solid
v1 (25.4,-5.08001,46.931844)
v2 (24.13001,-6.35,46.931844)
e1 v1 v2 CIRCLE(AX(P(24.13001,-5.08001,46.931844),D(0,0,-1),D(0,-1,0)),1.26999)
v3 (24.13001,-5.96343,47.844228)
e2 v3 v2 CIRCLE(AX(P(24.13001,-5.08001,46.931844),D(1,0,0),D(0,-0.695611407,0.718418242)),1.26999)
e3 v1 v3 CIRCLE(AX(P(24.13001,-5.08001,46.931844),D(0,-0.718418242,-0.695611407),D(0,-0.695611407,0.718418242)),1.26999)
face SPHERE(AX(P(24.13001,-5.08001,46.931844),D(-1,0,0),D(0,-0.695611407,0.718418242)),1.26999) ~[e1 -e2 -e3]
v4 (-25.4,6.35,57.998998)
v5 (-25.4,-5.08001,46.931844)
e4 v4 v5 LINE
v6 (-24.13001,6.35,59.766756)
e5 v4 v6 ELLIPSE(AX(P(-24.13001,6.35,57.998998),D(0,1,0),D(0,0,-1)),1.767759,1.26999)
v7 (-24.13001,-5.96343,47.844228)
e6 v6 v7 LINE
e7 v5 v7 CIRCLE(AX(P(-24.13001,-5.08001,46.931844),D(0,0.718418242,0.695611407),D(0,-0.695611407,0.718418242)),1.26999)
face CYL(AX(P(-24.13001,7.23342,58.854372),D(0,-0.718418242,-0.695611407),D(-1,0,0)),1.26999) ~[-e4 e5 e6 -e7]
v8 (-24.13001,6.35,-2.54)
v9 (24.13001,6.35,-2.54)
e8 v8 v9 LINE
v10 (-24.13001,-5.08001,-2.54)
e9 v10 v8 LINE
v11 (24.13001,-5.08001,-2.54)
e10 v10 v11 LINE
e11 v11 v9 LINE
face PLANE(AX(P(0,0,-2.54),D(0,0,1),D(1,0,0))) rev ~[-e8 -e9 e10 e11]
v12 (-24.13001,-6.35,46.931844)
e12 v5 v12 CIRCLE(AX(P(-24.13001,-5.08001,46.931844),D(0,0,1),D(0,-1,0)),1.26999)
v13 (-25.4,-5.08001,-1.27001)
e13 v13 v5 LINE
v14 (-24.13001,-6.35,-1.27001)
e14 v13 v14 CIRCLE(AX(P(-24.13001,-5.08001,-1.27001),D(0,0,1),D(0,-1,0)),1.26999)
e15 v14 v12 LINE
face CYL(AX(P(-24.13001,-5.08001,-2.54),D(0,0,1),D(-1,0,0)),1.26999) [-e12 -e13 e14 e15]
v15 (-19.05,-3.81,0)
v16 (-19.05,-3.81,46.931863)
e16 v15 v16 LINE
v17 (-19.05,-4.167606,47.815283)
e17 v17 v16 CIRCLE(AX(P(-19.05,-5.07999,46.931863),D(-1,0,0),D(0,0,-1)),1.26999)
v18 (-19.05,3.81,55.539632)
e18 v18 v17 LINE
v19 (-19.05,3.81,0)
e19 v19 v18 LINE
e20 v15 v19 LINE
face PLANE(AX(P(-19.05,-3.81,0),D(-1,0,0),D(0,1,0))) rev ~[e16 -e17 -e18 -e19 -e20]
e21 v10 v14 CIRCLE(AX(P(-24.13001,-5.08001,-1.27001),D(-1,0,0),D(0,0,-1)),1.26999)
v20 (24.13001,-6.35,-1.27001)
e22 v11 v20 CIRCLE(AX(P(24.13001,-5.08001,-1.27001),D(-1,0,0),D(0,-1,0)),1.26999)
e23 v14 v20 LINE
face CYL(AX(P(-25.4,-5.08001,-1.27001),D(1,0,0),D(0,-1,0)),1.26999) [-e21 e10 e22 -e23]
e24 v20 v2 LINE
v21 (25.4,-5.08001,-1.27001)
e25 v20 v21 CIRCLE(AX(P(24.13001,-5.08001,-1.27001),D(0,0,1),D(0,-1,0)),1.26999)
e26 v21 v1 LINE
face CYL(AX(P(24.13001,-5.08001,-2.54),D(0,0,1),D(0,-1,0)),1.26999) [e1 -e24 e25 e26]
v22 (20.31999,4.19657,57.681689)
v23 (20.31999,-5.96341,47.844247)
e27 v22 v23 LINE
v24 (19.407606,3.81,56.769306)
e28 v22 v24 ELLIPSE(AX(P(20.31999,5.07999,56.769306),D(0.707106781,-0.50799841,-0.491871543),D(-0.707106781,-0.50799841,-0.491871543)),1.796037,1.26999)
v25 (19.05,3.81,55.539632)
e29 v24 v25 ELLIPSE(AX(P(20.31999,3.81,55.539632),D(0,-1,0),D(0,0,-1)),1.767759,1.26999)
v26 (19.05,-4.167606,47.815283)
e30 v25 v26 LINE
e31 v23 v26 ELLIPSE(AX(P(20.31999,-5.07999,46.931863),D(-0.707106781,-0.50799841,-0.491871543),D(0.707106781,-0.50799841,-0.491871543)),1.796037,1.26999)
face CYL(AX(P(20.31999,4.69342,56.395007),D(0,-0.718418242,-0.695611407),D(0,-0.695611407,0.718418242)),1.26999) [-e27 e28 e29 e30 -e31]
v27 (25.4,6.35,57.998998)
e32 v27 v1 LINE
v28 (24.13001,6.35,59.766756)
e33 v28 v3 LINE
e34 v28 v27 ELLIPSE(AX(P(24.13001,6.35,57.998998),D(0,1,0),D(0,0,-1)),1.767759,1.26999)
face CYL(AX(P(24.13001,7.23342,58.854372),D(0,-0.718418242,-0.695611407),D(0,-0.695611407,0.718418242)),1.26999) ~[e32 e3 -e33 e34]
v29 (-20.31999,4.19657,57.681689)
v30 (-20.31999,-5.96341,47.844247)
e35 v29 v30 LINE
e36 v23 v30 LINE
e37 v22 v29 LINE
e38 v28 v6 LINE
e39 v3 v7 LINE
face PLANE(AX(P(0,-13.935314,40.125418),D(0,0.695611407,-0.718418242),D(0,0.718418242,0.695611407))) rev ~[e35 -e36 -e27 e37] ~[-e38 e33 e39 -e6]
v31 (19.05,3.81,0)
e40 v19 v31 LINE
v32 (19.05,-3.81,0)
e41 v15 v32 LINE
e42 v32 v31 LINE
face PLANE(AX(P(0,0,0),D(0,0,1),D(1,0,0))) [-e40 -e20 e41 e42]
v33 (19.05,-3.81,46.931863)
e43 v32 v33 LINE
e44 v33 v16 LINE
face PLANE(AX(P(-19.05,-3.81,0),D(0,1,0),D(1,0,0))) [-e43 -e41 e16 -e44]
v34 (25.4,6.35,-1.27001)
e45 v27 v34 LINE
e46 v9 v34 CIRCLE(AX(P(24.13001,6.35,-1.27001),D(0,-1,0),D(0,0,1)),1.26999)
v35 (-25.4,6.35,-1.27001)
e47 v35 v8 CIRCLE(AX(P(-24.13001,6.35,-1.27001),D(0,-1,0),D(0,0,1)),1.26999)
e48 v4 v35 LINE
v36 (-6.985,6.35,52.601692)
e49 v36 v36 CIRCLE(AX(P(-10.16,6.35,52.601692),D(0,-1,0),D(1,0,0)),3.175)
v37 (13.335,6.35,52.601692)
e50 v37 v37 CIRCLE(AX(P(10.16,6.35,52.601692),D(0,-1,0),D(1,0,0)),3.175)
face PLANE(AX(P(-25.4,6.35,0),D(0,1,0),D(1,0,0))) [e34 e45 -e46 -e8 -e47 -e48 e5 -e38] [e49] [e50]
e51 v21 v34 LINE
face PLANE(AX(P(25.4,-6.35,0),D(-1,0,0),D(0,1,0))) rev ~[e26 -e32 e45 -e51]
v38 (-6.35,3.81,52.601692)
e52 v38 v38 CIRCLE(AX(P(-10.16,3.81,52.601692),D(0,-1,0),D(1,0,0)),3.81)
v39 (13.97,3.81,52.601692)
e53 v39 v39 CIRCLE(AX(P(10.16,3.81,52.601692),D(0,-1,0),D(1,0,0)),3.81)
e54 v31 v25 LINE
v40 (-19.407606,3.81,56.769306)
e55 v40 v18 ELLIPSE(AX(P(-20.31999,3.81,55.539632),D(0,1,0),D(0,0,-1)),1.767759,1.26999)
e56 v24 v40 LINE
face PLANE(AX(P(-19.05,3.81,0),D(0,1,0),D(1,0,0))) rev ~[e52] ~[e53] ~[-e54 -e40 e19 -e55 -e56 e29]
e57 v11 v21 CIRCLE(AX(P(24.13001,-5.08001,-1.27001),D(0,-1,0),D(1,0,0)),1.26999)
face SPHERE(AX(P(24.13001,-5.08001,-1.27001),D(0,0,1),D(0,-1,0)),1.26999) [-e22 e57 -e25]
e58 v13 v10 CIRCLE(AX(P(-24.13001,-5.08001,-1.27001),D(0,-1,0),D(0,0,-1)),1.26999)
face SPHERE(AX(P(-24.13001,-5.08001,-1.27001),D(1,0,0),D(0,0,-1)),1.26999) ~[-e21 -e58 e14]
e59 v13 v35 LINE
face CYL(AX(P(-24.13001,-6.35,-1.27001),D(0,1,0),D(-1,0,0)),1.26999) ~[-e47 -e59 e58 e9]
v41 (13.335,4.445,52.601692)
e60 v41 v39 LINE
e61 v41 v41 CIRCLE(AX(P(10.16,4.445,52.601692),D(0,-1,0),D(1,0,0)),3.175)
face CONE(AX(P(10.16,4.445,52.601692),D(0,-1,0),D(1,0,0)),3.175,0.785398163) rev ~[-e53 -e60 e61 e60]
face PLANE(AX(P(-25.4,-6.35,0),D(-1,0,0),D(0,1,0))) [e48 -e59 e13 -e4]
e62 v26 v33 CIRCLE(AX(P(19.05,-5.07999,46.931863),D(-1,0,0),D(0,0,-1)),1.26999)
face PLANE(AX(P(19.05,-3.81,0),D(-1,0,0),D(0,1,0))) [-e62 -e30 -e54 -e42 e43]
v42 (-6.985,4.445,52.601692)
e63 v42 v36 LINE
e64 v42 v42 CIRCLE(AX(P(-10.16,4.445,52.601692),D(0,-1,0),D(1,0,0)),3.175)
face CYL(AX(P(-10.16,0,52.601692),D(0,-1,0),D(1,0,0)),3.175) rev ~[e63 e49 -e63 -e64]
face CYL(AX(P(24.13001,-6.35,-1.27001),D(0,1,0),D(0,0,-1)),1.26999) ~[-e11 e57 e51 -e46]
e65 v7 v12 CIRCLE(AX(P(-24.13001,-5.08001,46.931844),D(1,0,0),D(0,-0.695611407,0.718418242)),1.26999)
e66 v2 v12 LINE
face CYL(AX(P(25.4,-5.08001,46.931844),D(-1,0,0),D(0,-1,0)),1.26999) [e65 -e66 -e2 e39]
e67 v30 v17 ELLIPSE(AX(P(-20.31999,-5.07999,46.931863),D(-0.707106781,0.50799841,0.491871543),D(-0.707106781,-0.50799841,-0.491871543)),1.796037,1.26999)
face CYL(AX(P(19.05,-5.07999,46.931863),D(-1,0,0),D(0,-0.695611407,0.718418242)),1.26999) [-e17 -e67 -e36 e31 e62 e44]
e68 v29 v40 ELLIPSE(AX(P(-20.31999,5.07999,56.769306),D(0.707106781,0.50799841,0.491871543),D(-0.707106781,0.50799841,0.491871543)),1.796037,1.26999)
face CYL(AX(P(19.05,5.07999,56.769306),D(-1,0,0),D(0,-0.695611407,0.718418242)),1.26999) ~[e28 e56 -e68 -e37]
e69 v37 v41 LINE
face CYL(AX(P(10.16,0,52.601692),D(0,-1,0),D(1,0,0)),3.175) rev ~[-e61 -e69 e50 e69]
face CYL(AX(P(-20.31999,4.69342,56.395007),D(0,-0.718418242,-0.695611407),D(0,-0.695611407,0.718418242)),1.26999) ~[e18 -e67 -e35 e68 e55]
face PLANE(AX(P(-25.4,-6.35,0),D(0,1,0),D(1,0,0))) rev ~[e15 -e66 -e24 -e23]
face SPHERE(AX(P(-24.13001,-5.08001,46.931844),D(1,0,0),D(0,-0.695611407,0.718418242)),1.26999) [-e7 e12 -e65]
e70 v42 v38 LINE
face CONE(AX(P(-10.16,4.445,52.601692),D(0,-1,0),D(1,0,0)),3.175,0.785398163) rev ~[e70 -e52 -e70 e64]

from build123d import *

# Parameters (mm, degrees)
F0_W     = 50.8
F0_H     = 12.7
F0_W_2   = 38.1
F0_H_2   = 7.62
F1_DEPTH = 2.54
F2_DEPTH = 63.5
F4_DEPTH = 50.8
F5_R     = 1.26999
F6_R     = 3.175
F7_DEPTH = 12.7
F8_SIZE  = 0.635


# Not quite as in the source:
# - a fillet or chamfer is up to 0.001 mm smaller than in the source, because OpenCascade refuses the exact size


with BuildPart() as f1:
    # F0 (on Top) → F1 (new body)
    with BuildSketch(Plane.XY):
        Rectangle(F0_W, F0_H)
        Rectangle(F0_W_2, F0_H_2, mode=Mode.SUBTRACT)
        Rectangle(F0_W_2, F0_H_2)
    extrude(amount=-F1_DEPTH)

    # F0 (on Top) → F2 (join)
    with BuildSketch(Plane.XY):
        Rectangle(F0_W, F0_H)
        Rectangle(F0_W_2, F0_H_2, mode=Mode.SUBTRACT)
    extrude(amount=F2_DEPTH)

    # F3 (on Right) → F4 (cut, symmetric)
    with BuildSketch(Plane.YZ):
        Polygon((-17.6573935896, 70.3983381391), (-13.9353135601, 40.1254184544), (17.3301566392, 70.3983381391), align=None)
    extrude(amount=F4_DEPTH, both=True, mode=Mode.SUBTRACT)

    # F5 (radius 1.27 in the source; OpenCascade refuses exactly that, so slightly less here)
    f5_edges = [f1.edges().sort_by_distance(p)[0] for p in [
        (25.4, -6.35, 22.464965),
        (0, -6.35, -2.54),
        (25.4, 0, -2.54),
        (-25.4, 0, -2.54),
        (-25.4, -6.35, 22.464965),
        (0, -6.35, 47.469929),
        (0, -3.81, 49.929295),
        (19.05, 0, 53.618343),
        (0, 3.81, 57.307391),
        (-19.05, 0, 53.618343),
        (-25.4, 0, 53.618343),
        (25.4, 0, 53.618343),
    ]]
    fillet(f5_edges, radius=F5_R)

    # F6 (on Front) → F7 (cut, symmetric)
    with BuildSketch(Plane.XZ):
        with Locations((-10.16, 52.6016924392)):
            Circle(F6_R)
        with Locations((10.16, 52.6016924392)):
            Circle(F6_R)
    extrude(amount=F7_DEPTH, both=True, mode=Mode.SUBTRACT)

    # F8
    f8_edges = [f1.edges().sort_by_distance(p)[0] for p in [
        (-13.335, 3.81, 52.601692),
        (6.985, 3.81, 52.601692),
    ]]
    chamfer(f8_edges, length=F8_SIZE)


solid = f1.part
